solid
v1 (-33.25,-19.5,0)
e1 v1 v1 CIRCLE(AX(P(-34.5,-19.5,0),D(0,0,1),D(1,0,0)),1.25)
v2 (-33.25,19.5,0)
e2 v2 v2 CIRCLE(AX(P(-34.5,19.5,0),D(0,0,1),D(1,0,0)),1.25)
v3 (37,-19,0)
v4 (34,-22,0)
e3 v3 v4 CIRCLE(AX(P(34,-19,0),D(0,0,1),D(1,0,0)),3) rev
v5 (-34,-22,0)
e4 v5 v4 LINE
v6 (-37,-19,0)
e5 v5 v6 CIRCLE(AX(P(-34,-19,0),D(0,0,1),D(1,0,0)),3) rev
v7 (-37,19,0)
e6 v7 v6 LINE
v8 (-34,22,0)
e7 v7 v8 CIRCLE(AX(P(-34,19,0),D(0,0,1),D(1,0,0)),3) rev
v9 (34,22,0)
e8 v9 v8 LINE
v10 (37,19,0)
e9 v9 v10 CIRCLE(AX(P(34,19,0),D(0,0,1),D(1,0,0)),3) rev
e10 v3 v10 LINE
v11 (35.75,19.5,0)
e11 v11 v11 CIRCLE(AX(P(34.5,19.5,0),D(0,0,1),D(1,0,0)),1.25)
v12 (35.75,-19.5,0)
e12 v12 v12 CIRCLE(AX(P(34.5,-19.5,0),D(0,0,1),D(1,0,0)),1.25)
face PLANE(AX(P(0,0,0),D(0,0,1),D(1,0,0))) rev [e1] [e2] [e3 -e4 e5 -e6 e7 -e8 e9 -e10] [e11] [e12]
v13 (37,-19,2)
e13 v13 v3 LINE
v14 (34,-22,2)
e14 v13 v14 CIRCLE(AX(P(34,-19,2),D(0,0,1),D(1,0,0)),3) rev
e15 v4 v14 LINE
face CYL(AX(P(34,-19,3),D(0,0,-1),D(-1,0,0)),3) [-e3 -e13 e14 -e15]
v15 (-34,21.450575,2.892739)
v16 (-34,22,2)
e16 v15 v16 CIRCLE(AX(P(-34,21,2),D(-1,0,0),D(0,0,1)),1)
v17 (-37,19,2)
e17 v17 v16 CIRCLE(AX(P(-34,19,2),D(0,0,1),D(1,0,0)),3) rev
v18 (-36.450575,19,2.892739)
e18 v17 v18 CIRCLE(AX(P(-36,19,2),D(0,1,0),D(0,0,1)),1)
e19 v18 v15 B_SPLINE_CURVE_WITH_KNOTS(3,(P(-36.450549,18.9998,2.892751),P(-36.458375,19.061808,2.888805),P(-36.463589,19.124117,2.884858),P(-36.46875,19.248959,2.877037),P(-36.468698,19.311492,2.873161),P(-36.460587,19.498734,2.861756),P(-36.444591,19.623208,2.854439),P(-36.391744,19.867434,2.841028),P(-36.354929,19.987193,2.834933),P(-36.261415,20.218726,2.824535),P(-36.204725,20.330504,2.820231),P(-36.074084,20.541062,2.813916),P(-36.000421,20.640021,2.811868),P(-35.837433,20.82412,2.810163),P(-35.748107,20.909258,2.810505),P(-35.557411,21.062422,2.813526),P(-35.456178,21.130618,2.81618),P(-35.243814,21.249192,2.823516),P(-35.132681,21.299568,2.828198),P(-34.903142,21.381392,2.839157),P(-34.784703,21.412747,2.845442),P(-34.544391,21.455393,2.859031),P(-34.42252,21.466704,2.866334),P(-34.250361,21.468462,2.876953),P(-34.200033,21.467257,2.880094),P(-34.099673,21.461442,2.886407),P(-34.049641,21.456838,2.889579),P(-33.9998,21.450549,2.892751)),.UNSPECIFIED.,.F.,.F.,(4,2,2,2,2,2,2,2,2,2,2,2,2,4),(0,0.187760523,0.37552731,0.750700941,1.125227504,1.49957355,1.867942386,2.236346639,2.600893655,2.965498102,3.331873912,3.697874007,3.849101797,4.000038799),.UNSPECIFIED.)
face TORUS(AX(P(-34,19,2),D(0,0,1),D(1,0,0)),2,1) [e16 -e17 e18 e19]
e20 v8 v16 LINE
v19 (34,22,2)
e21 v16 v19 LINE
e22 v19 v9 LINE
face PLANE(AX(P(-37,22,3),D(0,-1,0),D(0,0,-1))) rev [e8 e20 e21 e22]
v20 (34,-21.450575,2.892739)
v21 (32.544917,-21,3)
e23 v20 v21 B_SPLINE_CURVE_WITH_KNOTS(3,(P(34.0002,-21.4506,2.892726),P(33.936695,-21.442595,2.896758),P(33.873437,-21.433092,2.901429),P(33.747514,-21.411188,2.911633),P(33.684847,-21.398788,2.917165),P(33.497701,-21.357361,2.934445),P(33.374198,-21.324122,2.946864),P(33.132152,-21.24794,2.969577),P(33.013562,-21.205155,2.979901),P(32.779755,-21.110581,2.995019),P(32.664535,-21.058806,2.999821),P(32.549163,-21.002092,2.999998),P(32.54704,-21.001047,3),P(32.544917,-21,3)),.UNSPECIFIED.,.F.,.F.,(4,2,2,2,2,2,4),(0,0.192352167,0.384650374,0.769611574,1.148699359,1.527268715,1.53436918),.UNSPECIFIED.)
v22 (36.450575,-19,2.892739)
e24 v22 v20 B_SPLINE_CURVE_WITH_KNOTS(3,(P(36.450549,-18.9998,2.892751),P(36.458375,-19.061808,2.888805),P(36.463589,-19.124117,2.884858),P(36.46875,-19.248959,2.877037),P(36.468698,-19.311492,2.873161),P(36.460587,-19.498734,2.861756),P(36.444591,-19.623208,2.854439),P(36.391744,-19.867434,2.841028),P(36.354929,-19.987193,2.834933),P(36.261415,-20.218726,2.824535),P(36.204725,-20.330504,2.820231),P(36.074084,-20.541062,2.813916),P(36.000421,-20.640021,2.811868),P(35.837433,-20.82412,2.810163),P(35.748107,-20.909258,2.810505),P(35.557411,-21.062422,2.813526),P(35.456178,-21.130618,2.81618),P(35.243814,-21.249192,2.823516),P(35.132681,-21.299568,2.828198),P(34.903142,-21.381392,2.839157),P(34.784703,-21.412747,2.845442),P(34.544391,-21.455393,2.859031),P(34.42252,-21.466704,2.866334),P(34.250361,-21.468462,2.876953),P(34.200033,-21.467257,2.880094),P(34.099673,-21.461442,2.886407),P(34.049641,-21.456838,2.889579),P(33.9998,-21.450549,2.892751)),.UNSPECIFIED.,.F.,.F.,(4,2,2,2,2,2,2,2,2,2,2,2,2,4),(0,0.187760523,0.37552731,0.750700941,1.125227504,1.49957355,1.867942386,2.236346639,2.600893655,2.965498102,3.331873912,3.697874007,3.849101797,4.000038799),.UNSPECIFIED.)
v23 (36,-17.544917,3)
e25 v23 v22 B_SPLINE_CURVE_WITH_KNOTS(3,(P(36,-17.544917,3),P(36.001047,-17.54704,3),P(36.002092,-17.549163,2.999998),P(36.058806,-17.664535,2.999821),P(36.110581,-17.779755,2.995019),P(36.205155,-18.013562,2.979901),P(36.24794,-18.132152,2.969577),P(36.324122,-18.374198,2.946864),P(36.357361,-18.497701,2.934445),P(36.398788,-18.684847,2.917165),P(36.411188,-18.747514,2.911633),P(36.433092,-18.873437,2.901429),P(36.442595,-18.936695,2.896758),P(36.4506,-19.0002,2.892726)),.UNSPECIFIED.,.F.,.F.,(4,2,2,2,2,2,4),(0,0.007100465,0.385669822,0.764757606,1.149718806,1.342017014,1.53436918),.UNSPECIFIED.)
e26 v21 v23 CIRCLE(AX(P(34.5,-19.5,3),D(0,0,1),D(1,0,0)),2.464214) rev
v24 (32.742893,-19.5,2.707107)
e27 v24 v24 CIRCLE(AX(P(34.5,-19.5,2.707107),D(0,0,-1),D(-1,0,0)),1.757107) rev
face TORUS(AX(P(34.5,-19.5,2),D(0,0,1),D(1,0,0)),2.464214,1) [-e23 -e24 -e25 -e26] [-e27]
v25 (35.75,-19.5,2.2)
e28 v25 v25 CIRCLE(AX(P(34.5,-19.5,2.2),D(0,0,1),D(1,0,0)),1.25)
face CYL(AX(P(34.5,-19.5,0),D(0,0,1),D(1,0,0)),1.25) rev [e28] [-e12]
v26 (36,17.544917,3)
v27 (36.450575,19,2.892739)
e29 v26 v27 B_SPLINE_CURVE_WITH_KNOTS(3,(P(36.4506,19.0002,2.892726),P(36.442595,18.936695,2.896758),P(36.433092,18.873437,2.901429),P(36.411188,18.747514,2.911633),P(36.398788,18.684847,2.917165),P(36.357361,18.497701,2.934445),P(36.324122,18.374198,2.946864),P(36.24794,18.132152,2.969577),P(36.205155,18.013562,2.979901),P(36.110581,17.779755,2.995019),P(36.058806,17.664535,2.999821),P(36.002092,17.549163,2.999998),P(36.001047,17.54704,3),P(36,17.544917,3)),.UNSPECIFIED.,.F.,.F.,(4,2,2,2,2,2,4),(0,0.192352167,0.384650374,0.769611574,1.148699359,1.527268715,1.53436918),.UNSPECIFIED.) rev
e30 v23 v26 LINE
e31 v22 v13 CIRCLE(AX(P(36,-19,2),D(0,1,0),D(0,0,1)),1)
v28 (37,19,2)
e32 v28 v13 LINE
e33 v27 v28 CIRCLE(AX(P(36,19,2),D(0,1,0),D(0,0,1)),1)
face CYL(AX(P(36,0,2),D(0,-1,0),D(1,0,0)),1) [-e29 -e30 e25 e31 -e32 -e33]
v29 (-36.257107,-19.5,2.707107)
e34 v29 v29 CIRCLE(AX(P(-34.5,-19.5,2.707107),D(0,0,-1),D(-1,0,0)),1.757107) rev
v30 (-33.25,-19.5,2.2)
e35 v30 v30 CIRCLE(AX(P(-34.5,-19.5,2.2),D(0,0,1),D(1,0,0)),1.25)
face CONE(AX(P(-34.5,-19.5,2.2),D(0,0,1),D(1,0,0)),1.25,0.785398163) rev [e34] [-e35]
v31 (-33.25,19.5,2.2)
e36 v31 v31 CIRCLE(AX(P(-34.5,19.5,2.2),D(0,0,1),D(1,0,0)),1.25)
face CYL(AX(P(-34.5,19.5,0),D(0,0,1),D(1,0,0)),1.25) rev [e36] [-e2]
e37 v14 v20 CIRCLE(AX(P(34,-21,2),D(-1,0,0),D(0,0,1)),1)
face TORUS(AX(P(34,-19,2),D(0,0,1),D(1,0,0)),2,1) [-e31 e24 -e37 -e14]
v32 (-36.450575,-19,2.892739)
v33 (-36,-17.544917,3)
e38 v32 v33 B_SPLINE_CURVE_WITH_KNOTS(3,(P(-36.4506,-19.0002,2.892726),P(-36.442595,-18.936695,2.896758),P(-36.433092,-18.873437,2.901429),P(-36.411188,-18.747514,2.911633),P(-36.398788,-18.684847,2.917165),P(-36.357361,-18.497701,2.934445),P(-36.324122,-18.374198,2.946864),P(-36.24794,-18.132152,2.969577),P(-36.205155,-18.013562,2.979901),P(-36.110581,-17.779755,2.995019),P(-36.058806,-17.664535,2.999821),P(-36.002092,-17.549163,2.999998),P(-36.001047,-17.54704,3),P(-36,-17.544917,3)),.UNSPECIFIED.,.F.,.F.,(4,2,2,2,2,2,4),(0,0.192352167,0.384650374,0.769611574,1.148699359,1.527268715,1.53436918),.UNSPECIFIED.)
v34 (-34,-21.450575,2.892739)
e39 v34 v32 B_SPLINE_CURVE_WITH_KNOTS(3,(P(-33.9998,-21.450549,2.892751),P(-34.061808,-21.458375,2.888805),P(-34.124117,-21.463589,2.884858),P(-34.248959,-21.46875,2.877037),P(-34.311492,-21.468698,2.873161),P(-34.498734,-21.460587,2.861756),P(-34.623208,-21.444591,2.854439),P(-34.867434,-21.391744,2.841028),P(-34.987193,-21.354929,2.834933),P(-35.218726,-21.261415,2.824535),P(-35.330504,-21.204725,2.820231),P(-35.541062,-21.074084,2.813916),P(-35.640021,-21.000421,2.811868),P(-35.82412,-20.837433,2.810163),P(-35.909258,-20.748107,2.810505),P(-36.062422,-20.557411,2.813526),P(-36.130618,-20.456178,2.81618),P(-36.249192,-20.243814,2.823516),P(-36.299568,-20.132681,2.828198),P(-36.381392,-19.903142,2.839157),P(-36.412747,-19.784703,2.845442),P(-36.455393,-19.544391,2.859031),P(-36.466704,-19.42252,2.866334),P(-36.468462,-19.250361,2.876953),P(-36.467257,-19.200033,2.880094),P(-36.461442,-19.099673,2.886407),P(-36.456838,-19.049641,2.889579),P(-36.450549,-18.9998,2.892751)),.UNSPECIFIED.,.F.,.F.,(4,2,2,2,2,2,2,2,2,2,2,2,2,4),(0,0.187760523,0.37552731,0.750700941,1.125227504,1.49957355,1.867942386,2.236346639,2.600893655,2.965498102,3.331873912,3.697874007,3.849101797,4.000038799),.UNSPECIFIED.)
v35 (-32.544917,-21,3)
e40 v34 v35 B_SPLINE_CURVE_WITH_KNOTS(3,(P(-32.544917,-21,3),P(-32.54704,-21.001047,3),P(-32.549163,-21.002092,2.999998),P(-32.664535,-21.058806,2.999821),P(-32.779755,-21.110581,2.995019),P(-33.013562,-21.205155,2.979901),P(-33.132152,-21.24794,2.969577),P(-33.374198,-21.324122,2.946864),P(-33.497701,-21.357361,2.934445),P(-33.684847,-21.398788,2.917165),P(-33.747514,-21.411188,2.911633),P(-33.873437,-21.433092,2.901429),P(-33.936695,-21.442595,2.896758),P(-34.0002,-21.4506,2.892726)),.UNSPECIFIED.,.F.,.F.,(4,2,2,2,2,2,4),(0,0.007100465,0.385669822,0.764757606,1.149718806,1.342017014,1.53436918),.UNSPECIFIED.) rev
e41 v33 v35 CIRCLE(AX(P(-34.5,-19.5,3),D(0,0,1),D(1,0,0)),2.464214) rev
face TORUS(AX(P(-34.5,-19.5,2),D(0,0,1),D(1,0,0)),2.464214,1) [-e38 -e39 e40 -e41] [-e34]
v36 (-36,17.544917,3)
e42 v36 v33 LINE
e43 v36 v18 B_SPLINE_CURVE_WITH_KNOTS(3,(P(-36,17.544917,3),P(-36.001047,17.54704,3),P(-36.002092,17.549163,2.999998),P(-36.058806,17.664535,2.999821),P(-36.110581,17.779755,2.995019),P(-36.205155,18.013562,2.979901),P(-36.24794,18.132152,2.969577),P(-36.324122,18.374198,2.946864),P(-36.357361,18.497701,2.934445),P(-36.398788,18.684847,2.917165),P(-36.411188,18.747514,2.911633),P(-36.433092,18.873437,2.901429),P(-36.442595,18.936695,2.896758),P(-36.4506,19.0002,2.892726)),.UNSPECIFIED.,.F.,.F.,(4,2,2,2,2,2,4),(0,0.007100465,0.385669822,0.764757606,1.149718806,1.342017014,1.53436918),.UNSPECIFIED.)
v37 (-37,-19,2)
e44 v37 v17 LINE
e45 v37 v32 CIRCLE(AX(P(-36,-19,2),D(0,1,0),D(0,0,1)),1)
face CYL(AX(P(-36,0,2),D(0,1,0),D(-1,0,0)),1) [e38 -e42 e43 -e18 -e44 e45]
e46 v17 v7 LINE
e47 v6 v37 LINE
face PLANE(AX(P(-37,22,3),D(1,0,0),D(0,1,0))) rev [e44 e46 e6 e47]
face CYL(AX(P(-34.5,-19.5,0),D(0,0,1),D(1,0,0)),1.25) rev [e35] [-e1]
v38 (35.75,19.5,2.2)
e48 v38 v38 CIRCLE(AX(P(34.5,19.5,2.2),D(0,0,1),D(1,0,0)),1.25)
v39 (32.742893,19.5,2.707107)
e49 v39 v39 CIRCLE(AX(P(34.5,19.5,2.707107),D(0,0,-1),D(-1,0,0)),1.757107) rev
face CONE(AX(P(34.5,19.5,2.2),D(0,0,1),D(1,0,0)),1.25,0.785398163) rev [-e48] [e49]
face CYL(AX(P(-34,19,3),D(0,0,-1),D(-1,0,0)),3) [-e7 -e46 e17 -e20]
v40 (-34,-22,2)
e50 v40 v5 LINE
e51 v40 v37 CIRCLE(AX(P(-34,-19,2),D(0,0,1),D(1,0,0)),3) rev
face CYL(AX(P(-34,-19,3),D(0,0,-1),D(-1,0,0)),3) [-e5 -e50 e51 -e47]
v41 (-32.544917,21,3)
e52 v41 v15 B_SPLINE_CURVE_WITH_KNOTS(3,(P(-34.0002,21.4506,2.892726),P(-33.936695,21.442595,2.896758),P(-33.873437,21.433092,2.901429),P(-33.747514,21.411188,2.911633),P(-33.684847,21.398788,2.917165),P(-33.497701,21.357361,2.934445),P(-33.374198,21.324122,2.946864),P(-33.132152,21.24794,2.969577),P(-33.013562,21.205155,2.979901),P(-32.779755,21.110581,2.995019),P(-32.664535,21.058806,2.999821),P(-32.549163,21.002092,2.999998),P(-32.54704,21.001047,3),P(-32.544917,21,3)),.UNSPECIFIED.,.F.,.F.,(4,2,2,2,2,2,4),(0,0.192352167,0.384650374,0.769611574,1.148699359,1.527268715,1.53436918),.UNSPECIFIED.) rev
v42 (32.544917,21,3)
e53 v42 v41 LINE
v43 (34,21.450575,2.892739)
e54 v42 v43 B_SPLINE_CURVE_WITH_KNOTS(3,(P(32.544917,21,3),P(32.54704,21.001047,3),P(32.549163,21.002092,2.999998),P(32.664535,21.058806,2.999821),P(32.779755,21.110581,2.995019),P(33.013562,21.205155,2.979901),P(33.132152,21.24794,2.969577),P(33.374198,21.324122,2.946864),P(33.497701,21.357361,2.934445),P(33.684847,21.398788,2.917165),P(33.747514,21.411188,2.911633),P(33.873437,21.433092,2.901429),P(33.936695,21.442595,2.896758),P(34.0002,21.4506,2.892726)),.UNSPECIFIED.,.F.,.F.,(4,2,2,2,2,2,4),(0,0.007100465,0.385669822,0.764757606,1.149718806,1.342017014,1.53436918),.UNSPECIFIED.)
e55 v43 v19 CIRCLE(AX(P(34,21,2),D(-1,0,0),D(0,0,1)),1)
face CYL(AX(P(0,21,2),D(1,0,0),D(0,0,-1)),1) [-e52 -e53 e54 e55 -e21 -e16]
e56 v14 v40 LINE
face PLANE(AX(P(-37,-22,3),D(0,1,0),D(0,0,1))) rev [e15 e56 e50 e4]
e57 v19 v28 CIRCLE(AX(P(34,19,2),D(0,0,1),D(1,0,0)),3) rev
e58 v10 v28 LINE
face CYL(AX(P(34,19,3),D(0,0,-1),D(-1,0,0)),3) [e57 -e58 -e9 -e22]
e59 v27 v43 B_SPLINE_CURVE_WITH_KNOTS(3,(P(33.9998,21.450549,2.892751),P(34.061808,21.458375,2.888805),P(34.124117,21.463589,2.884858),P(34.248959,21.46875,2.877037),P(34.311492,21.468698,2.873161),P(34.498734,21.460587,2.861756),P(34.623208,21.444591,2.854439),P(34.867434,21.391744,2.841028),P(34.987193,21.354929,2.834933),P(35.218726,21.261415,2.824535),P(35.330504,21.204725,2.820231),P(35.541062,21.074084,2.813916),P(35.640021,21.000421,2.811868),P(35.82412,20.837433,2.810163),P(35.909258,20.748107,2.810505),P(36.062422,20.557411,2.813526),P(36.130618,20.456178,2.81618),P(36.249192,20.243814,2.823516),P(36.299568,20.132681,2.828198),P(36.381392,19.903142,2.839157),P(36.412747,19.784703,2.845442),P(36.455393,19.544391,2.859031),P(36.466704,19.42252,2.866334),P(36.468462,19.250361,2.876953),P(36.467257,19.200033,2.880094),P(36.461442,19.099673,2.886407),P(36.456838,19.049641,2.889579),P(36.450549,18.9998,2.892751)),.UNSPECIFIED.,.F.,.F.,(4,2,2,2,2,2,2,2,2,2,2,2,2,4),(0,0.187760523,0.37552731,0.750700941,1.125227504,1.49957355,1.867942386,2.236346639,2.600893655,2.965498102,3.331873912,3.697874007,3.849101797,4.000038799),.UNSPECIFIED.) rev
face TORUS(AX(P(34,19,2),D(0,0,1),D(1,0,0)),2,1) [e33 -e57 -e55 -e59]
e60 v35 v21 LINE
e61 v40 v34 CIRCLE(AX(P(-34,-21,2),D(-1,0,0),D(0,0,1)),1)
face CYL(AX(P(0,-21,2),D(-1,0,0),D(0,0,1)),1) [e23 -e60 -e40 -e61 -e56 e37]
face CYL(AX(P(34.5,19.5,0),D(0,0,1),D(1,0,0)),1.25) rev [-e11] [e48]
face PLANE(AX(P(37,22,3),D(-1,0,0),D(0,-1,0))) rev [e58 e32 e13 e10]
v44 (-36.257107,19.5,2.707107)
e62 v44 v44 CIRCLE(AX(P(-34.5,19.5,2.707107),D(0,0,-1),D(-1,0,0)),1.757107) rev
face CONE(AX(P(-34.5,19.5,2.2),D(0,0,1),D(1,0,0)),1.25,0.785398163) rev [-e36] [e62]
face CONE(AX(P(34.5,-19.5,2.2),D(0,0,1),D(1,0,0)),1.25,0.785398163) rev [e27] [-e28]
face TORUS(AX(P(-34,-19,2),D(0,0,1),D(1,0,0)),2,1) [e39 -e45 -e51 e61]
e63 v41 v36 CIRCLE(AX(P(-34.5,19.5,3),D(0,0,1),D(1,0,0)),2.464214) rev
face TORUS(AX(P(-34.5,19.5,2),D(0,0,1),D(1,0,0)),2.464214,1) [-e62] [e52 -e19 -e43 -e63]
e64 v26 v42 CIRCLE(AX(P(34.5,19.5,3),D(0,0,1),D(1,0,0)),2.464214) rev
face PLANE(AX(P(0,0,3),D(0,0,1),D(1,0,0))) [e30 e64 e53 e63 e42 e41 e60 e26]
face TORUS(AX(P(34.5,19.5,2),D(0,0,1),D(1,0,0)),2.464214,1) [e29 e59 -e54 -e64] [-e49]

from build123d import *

# Parameters (mm, degrees)
IZIM1_W                     = 74
IZIM1_H                     = 44
Y_KSEKLIK_EKSTR_ZYON1_DEPTH = 3
IZIM2_R                     = 1.25
KES_EKSTR_ZYON1_DEPTH       = 44.150898021
RADYUS1_R                   = 3
PAH1_SIZE                   = 0.8
RADYUS2_R                   = 1


with BuildPart() as part:
    # Çizim1 → Yükseklik-Ekstrüzyon1 (new body)
    with BuildSketch(Plane.XY):
        Rectangle(IZIM1_W, IZIM1_H)
    extrude(amount=Y_KSEKLIK_EKSTR_ZYON1_DEPTH)

    # Çizim2 → Kes-Ekstrüzyon1 (cut, through all)
    with BuildSketch(Plane.XY.offset(3)):
        with Locations((-34.5, 19.5)):
            Circle(IZIM2_R)
        with Locations((-34.5, -19.5)):
            Circle(IZIM2_R)
        with Locations((34.5, 19.5)):
            Circle(IZIM2_R)
        with Locations((34.5, -19.5)):
            Circle(IZIM2_R)
    extrude(amount=-KES_EKSTR_ZYON1_DEPTH, mode=Mode.SUBTRACT)

    # Radyus1
    radyus1_edges = [part.edges().sort_by_distance(p)[0] for p in [
        (37, -22, 1.5),
        (-37, -22, 1.5),
        (-37, 22, 1.5),
        (37, 22, 1.5),
    ]]
    fillet(radyus1_edges, radius=RADYUS1_R)

    # Pah1
    pah1_edges = [part.edges().sort_by_distance(p)[0] for p in [
        (-35.75, -19.5, 3),
        (33.25, 19.5, 3),
        (33.25, -19.5, 3),
        (-35.75, 19.5, 3),
    ]]
    chamfer(pah1_edges, length=PAH1_SIZE)

    # Radyus2
    # the kernel refuses this fillet: 1 mm, written as the material it takes off along each edge
    with BuildSketch(Plane(origin=(34, -22, 3), x_dir=(0, 1, 0), z_dir=(-1, 0, 0)), Plane(origin=(-34, 22, 3), x_dir=(0, -1, 0), z_dir=(1, 0, 0))) as radyus2_piece_1:
        with BuildLine():
            CenterArc((RADYUS2_R, RADYUS2_R), RADYUS2_R, 180, 90)
            Line((0, RADYUS2_R), (0, 0))
            Line((0, 0), (RADYUS2_R, 0))
        make_face()
    extrude(amount=68, mode=Mode.SUBTRACT)
    with BuildSketch(Plane(origin=(-37, -19, 3), x_dir=(1, 0, 0), z_dir=(0, 1, 0)), Plane(origin=(37, 19, 3), x_dir=(-1, 0, 0), z_dir=(0, -1, 0))) as radyus2_piece_2:
        with BuildLine():
            CenterArc((RADYUS2_R, RADYUS2_R), RADYUS2_R, 180, 90)
            Line((0, RADYUS2_R), (0, 0))
            Line((0, 0), (RADYUS2_R, 0))
        make_face()
    extrude(amount=38, mode=Mode.SUBTRACT)
    with BuildSketch(Plane(origin=(-34, 19, 3), x_dir=(0, 1, 0), z_dir=(1, 0, 0))) as radyus2_piece_3:
        with BuildLine():
            CenterArc((3 - RADYUS2_R, -RADYUS2_R), RADYUS2_R, 0, 90)
            Line((3, -RADYUS2_R), (3, 0))
            Line((3, 0), (3 - RADYUS2_R, 0))
        make_face()
    revolve(axis=Axis((-34, 19, 3), (0, 0, 1)), revolution_arc=90, mode=Mode.SUBTRACT)
    with BuildSketch(Plane(origin=(34, 19, 3), x_dir=(0, 1, 0), z_dir=(-1, 0, 0))) as radyus2_piece_4:
        with BuildLine():
            CenterArc((3 - RADYUS2_R, RADYUS2_R), RADYUS2_R, 270, 90)
            Line((3, RADYUS2_R), (3, 0))
            Line((3, 0), (3 - RADYUS2_R, 0))
        make_face()
    revolve(axis=Axis((34, 19, 3), (0, 0, -1)), revolution_arc=90, mode=Mode.SUBTRACT)
    with BuildSketch(Plane(origin=(34, -19, 3), x_dir=(1, 0, 0), z_dir=(0, 1, 0))) as radyus2_piece_5:
        with BuildLine():
            CenterArc((3 - RADYUS2_R, RADYUS2_R), RADYUS2_R, 270, 90)
            Line((3, RADYUS2_R), (3, 0))
            Line((3, 0), (3 - RADYUS2_R, 0))
        make_face()
    revolve(axis=Axis((34, -19, 3), (0, 0, -1)), revolution_arc=90, mode=Mode.SUBTRACT)
    with BuildSketch(Plane(origin=(-34, -19, 3), x_dir=(-1, 0, 0), z_dir=(0, 1, 0))) as radyus2_piece_6:
        with BuildLine():
            CenterArc((3 - RADYUS2_R, -RADYUS2_R), RADYUS2_R, 0, 90)
            Line((3, -RADYUS2_R), (3, 0))
            Line((3, 0), (3 - RADYUS2_R, 0))
        make_face()
    revolve(axis=Axis((-34, -19, 3), (0, 0, 1)), revolution_arc=90, mode=Mode.SUBTRACT)
    with BuildSketch(Plane(origin=(-34.5, 19.5, 3), x_dir=(1, 0, 0), z_dir=(0, -1, 0))) as radyus2_piece_7:
        with BuildLine():
            CenterArc((2.05 + RADYUS2_R * 0.414213562373, -RADYUS2_R), RADYUS2_R, 90, 45)
            Line((2.05 - RADYUS2_R * 0.292893218813, -RADYUS2_R * 0.292893218813), (2.05, 0))
            Line((2.05, 0), (2.05 + RADYUS2_R * 0.414213562373, 0))
        make_face()
    revolve(axis=Axis((-34.5, 19.5, 3), (0, 0, 1)), mode=Mode.SUBTRACT)
    with BuildSketch(Plane(origin=(-34.5, -19.5, 3), x_dir=(1, 0, 0), z_dir=(0, -1, 0))) as radyus2_piece_8:
        with BuildLine():
            CenterArc((2.05 + RADYUS2_R * 0.414213562373, -RADYUS2_R), RADYUS2_R, 90, 45)
            Line((2.05 - RADYUS2_R * 0.292893218813, -RADYUS2_R * 0.292893218813), (2.05, 0))
            Line((2.05, 0), (2.05 + RADYUS2_R * 0.414213562373, 0))
        make_face()
    revolve(axis=Axis((-34.5, -19.5, 3), (0, 0, 1)), mode=Mode.SUBTRACT)
    with BuildSketch(Plane(origin=(34.5, -19.5, 3), x_dir=(1, 0, 0), z_dir=(0, -1, 0))) as radyus2_piece_9:
        with BuildLine():
            CenterArc((2.05 + RADYUS2_R * 0.414213562373, -RADYUS2_R), RADYUS2_R, 90, 45)
            Line((2.05 - RADYUS2_R * 0.292893218813, -RADYUS2_R * 0.292893218813), (2.05, 0))
            Line((2.05, 0), (2.05 + RADYUS2_R * 0.414213562373, 0))
        make_face()
    revolve(axis=Axis((34.5, -19.5, 3), (0, 0, 1)), mode=Mode.SUBTRACT)
    with BuildSketch(Plane(origin=(34.5, 19.5, 3), x_dir=(1, 0, 0), z_dir=(0, -1, 0))) as radyus2_piece_10:
        with BuildLine():
            CenterArc((2.05 + RADYUS2_R * 0.414213562373, -RADYUS2_R), RADYUS2_R, 90, 45)
            Line((2.05 - RADYUS2_R * 0.292893218813, -RADYUS2_R * 0.292893218813), (2.05, 0))
            Line((2.05, 0), (2.05 + RADYUS2_R * 0.414213562373, 0))
        make_face()
    revolve(axis=Axis((34.5, 19.5, 3), (0, 0, 1)), mode=Mode.SUBTRACT)


solid = part.part
